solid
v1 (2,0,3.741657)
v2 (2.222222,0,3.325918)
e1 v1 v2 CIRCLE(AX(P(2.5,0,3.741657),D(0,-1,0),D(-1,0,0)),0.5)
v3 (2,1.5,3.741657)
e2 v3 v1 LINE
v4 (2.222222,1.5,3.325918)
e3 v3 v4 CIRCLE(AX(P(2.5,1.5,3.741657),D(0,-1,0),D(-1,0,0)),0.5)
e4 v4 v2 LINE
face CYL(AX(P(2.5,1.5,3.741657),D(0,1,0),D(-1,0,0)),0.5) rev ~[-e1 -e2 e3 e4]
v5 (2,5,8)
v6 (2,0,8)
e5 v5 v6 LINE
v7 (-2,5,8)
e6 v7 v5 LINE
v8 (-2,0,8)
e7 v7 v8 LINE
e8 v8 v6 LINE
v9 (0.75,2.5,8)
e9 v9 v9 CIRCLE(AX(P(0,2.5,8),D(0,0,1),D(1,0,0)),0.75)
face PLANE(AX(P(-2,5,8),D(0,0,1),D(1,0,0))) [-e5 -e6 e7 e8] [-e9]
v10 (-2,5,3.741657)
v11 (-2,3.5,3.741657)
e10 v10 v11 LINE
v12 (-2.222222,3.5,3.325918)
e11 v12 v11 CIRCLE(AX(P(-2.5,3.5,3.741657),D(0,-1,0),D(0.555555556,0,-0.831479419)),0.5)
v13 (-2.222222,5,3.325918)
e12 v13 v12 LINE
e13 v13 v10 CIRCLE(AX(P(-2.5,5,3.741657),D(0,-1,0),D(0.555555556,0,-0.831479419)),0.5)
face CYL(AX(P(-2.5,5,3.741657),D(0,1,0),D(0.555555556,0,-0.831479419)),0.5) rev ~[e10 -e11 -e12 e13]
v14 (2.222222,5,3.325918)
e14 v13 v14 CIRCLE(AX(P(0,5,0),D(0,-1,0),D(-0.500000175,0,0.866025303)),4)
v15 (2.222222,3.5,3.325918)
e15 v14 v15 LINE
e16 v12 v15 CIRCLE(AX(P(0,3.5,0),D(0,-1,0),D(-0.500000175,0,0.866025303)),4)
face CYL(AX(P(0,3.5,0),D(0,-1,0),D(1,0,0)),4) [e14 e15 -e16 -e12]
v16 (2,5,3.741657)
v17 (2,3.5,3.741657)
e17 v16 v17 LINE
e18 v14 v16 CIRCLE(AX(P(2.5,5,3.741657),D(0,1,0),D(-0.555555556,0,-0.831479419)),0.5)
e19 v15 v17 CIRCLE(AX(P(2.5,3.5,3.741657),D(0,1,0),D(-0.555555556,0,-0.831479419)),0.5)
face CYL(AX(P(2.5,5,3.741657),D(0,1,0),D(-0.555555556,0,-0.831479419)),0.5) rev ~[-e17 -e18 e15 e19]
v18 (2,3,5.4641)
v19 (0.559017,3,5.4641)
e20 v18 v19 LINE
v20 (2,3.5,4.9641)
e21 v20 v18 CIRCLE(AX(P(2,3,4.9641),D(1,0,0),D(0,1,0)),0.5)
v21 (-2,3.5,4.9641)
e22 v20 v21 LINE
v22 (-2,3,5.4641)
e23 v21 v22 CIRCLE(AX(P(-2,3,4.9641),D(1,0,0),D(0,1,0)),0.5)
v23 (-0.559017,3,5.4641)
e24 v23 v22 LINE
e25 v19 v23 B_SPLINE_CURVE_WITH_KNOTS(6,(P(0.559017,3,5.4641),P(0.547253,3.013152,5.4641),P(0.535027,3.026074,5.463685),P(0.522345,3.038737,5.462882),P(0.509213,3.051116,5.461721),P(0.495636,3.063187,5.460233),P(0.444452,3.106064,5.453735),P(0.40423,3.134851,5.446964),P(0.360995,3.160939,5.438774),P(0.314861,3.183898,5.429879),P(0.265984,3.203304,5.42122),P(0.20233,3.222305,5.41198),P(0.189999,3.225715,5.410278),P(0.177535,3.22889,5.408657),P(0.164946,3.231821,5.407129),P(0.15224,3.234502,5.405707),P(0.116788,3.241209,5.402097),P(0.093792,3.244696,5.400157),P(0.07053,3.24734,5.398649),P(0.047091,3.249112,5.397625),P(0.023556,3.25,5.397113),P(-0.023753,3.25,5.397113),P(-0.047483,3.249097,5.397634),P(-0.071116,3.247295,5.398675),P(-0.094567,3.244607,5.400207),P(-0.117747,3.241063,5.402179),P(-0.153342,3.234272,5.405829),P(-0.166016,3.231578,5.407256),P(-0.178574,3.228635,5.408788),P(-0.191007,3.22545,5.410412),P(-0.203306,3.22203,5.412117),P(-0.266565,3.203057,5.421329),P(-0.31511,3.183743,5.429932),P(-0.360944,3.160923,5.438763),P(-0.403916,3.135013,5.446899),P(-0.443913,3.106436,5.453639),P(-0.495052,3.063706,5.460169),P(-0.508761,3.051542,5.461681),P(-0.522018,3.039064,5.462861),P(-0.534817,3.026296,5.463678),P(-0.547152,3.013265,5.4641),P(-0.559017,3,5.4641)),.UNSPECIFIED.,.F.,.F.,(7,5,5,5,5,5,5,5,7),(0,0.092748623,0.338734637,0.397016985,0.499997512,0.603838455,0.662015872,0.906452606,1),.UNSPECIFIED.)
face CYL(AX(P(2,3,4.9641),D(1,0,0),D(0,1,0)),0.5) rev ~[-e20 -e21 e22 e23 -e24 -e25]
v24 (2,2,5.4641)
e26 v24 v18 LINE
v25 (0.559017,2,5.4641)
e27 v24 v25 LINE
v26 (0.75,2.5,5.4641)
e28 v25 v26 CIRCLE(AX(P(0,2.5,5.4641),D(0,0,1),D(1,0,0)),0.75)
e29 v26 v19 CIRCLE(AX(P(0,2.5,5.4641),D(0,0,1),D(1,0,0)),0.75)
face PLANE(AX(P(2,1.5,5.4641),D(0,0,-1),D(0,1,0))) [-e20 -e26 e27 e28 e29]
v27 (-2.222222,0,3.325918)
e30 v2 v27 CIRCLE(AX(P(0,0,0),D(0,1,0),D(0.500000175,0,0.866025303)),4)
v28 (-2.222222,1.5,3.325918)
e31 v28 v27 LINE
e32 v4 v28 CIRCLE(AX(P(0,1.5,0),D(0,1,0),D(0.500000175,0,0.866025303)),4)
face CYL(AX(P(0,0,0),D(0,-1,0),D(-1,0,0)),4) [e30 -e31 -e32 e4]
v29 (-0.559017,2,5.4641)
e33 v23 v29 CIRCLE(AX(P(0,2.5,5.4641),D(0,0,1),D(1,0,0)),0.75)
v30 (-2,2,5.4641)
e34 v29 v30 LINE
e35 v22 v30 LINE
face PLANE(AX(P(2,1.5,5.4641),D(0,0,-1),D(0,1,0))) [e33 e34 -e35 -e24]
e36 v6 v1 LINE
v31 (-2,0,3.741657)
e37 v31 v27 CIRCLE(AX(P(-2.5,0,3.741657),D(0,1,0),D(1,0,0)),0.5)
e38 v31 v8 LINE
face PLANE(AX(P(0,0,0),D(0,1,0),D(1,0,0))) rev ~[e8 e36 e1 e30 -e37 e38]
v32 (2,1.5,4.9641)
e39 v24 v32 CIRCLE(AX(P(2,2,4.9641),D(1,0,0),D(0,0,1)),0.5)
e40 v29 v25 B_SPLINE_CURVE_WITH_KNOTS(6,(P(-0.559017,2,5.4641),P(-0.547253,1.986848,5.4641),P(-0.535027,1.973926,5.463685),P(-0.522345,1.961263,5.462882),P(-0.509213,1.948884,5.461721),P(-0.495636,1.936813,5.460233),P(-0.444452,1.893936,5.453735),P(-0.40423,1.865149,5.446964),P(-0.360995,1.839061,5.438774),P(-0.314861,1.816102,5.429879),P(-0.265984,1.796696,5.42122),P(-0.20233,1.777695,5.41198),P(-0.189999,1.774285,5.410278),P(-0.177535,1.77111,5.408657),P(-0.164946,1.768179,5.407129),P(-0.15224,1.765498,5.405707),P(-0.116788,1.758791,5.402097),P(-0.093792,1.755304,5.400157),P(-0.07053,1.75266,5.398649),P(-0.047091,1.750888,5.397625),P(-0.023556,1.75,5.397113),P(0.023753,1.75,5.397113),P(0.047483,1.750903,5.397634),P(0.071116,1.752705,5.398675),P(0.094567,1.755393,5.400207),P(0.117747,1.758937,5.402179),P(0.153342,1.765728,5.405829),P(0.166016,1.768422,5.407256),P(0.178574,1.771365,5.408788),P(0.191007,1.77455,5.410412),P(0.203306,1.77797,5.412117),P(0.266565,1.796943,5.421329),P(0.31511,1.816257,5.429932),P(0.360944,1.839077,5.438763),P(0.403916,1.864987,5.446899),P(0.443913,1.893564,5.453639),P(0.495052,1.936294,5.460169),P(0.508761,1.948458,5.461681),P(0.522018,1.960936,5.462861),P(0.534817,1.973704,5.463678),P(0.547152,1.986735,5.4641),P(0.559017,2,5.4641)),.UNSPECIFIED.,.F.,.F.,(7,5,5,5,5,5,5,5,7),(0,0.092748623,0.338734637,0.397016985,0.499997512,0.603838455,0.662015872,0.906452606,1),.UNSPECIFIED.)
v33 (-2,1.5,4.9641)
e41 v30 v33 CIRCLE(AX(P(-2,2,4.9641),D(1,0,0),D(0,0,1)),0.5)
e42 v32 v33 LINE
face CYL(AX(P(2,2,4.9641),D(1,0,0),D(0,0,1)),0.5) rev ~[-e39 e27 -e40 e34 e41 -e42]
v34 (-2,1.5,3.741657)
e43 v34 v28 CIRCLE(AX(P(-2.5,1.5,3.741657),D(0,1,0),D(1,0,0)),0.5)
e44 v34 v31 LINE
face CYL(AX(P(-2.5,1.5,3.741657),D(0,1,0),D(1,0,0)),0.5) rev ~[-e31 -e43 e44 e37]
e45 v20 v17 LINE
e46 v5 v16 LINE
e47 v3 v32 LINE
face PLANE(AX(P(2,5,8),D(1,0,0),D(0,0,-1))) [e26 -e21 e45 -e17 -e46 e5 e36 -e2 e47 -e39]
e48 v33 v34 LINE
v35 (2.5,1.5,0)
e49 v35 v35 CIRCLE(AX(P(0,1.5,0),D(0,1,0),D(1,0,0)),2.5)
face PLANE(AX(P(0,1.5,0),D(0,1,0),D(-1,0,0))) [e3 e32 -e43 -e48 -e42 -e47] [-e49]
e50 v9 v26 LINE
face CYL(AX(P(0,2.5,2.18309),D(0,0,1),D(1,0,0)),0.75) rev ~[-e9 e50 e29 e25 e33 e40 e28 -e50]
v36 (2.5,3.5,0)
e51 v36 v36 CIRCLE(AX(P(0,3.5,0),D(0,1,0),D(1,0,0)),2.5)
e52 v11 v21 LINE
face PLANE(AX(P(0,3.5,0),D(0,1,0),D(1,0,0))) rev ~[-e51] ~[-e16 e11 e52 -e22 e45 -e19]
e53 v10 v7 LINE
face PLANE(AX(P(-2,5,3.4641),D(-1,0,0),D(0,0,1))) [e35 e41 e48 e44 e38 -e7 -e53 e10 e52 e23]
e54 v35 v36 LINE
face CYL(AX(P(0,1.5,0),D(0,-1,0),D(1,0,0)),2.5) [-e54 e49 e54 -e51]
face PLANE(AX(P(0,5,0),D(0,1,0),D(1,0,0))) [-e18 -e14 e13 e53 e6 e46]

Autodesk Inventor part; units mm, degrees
ref_plane "YZ Plane" through (0, 0, 0) normal (1, 0, 0) x (0, 1, 0)
ref_plane "XZ Plane" through (0, 0, 0) normal (0, 1, 0) x (-1, 0, 0)
ref_plane "XY Plane" through (0, 0, 0) normal (0, 0, 1) x (1, 0, 0)
sketch "Sketch1" plane through (0, 0, 0) normal (0, 1, 0) x (-1, 0, 0)
  circle A0 centre (0, 0) radius 4
  dimension "d7" = 8
extrude "Extrusion1" add sketch "Sketch1" along normal blind 1.5
sketch "Sketch2" plane through (0, 1.5, 0) normal (0, 1, 0) x (1, 0, 0)
  circle A0 centre (0, 0) radius 2.5
  dimension "d10" = 5
extrude "Extrusion2" add sketch "Sketch2" along normal blind 2
sketch "Sketch3" plane through (0, 3.5, 0) normal (0, 1, 0) x (1, 0, 0)
  circle A0 centre (0, 0) radius 2.5 projected
  circle A1 centre (0, 0) radius 4 projected
extrude "Extrusion3" add sketch "Sketch3" along normal blind 1.5 contours A0 | A1
sketch "Sketch5" plane through (0, 5, 0) normal (0, 1, 0) x (1, 0, 0)
  circle A0 centre (0, 0) radius 2.5 projected
  circle A1 centre (0, 0) radius 4 projected
  circle A2 centre (0, 0) radius 4 projected
  line L0 (2, -3.4641) -> (-2, -3.4641)
  line L1 (-2, -3.4641) -> (-2, -8)
  line L2 (-2, -8) -> (2, -8)
  line L3 (2, -8) -> (2, -3.4641)
  dimension "d15" = 4
  dimension "d16" = 4
extrude "Extrusion4" add sketch "Sketch5" against normal blind 5 contours A1 L3 L2 L1
sketch "Sketch6" plane through (-2, 5, 8) normal (0, 0, 1) x (1, 0, 0)
  circle A0 centre (2, -2.5) radius 0.75
  line L0 (6, -1.5) -> (-2, -1.5) projected
  point P0 (2, -5)
  point P1 (4, -1.5)
  point P2 (0, -1.5)
  dimension "d21" = 1.5
  dimension "d27" = 1
extrude "Extrusion5" cut sketch "Sketch6" against normal blind 4.5
sketch "Sketch8" plane through (2, 5, 8) normal (1, 0, 0) x (0, 0, -1)
  line L0 (4.5359, -1.5) -> (4.5359, -3.5) projected
  line L1 (4.5359, -1.5) -> (4.5359, -3.5)
  line L2 (4.5359, -3.5) -> (2.5359, -3.5)
  line L3 (2.5359, -3.5) -> (2.5359, -1.5)
  line L4 (2.5359, -1.5) -> (4.5359, -1.5)
  point P0 (8, -5)
  dimension "d24" = 2
extrude "Extrusion6" cut sketch "Sketch8" against normal blind 4.5
fillet "Fillet1" radius 0.5 6 edges at (0, 3.5, 5.4641) (0, 1.5, 5.4641) (2, 4.25, 3.4641) (2, 0.75, 3.4641) (-2, 4.25, 3.4641) (-2, 0.75, 3.4641)
properties part number "Differential"
